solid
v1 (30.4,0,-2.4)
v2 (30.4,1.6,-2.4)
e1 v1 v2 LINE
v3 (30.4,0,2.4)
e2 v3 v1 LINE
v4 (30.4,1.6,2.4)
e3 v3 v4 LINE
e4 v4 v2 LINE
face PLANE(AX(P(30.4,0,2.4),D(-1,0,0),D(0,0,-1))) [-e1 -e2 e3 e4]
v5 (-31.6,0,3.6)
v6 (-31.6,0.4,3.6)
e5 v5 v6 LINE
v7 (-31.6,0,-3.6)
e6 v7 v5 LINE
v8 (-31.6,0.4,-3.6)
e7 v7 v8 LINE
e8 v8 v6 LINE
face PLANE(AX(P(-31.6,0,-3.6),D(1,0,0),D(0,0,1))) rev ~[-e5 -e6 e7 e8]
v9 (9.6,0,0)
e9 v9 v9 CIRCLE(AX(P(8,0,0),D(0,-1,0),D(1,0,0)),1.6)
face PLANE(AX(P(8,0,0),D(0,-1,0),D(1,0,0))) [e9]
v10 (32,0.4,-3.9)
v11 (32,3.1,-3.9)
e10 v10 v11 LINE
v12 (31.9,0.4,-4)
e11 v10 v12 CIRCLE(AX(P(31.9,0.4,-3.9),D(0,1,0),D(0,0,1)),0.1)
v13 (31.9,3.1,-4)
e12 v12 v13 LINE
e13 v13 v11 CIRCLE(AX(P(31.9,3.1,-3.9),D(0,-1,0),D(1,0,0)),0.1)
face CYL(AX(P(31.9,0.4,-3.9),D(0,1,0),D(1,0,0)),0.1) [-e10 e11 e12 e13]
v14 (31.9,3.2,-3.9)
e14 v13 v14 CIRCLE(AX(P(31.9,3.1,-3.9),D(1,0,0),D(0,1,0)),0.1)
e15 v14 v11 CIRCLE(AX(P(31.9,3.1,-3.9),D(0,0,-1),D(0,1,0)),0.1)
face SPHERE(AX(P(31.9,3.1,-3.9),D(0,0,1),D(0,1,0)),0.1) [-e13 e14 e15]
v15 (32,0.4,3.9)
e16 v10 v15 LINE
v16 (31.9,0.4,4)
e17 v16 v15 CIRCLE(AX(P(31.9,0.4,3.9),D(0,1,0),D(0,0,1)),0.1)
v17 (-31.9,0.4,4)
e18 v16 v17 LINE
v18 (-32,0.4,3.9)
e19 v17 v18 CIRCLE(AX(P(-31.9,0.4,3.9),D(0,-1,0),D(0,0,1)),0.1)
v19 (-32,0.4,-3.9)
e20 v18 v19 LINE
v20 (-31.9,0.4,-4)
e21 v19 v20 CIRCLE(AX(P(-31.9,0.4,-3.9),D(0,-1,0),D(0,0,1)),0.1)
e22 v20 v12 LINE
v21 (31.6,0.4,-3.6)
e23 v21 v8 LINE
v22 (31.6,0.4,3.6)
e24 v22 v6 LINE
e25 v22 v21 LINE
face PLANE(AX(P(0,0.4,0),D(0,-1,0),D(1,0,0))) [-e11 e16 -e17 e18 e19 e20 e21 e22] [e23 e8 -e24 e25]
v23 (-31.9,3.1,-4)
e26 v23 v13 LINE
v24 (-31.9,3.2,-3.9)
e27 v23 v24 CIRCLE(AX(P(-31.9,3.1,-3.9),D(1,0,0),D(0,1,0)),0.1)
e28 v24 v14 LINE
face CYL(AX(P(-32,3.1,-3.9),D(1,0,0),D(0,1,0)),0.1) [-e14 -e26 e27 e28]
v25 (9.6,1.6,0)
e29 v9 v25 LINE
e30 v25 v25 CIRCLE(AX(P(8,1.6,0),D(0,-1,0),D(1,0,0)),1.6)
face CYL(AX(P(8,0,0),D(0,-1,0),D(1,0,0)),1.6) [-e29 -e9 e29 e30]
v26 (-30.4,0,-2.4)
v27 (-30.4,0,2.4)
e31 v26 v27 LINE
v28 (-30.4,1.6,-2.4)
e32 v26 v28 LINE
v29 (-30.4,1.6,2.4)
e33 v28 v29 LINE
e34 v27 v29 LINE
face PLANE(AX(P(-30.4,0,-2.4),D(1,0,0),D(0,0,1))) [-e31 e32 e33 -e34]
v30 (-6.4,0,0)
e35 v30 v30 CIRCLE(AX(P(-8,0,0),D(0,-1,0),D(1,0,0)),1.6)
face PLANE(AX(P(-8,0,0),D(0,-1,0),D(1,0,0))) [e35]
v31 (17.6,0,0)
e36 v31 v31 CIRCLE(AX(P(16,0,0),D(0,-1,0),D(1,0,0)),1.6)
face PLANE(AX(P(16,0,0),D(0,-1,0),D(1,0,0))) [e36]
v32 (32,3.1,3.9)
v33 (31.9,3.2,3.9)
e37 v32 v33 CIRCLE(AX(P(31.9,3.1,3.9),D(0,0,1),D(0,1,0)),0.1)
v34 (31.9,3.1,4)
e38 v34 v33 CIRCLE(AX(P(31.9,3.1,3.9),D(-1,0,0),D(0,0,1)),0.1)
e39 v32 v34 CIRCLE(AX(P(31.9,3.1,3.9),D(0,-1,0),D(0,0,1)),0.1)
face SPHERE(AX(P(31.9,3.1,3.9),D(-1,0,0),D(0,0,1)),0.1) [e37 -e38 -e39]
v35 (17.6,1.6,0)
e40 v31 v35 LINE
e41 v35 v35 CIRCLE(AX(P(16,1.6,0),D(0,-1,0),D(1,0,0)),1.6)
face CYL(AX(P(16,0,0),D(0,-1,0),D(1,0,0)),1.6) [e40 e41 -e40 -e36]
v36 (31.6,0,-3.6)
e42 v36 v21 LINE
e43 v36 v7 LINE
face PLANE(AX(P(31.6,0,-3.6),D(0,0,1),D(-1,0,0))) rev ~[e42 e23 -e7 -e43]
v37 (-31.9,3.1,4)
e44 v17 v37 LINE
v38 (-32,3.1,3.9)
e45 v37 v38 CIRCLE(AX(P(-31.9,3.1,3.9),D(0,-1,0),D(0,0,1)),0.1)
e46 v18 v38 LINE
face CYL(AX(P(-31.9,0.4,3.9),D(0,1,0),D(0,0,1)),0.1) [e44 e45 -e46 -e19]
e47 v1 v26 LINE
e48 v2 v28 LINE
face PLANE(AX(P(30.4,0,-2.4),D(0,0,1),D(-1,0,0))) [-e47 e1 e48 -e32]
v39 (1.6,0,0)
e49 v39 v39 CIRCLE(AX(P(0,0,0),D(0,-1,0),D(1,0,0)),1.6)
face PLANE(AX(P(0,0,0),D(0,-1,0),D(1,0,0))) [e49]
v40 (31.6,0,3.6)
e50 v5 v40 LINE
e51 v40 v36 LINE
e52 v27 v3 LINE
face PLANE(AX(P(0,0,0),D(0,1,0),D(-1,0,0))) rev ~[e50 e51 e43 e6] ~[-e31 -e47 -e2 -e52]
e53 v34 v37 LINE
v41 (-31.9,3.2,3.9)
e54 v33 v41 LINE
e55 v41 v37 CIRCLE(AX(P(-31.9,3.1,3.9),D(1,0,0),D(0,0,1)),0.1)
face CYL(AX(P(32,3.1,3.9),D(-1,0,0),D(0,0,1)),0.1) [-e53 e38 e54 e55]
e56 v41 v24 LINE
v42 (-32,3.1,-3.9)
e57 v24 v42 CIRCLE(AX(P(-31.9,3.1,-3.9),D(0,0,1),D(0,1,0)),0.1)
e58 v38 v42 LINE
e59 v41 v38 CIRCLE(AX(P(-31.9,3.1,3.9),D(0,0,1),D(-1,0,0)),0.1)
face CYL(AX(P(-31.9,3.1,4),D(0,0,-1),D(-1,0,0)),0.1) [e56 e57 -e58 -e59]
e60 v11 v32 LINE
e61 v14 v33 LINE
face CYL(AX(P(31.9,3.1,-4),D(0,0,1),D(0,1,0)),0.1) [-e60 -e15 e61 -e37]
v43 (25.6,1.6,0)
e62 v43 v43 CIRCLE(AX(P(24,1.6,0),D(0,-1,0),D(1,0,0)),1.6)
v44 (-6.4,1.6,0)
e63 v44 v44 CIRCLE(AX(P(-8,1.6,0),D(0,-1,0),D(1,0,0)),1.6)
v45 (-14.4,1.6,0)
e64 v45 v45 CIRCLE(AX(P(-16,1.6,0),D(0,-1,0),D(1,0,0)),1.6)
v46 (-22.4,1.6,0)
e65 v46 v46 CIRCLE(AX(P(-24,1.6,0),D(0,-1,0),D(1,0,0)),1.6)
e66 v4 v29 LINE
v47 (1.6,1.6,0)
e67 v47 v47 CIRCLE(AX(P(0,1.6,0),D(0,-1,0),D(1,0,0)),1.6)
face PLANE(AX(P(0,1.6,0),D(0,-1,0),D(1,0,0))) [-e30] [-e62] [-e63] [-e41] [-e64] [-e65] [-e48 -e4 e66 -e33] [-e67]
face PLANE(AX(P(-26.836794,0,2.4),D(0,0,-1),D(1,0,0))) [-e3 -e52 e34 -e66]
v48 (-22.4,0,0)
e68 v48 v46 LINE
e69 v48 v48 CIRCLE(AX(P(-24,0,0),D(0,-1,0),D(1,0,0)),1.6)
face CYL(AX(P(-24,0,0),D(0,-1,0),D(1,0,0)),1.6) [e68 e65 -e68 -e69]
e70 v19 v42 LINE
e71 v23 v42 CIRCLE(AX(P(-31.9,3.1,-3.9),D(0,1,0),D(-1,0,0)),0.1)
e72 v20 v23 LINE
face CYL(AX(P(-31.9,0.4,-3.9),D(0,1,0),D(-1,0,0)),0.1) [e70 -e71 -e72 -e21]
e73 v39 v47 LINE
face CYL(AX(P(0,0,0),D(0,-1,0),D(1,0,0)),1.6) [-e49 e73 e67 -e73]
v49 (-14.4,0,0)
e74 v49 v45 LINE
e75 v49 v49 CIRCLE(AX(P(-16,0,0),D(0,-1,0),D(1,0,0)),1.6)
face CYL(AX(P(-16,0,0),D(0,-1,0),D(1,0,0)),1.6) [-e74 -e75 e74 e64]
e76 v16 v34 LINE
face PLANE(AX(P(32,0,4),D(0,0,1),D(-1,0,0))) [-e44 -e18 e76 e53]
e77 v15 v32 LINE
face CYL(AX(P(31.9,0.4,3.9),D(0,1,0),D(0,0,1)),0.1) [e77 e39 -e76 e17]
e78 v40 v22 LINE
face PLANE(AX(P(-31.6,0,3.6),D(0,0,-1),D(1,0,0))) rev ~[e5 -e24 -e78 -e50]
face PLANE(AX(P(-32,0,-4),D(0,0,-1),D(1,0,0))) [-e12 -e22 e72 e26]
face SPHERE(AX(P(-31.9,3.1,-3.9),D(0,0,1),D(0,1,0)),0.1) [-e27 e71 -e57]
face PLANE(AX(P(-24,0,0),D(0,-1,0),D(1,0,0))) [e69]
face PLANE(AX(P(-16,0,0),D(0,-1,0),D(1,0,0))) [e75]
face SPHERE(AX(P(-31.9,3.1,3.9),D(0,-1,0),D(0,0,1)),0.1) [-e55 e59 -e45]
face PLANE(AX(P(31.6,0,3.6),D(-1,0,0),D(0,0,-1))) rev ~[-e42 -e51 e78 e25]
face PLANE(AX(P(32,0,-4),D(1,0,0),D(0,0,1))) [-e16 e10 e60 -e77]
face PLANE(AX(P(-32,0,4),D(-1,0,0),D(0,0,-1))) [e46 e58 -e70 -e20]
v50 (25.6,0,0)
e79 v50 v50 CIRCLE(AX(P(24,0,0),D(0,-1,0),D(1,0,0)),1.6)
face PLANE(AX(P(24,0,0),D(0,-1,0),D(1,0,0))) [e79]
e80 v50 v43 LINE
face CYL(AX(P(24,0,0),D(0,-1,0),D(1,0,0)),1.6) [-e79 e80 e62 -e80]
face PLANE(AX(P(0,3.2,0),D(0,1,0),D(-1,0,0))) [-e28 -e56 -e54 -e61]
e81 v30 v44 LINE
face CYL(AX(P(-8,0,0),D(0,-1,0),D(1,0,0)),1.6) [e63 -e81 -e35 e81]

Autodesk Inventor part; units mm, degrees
ref_plane "YZ Plane" through (0, 0, 0) normal (1, 0, 0) x (0, 1, 0)
ref_plane "XZ Plane" through (0, 0, 0) normal (0, 1, 0) x (-1, 0, 0)
ref_plane "XY Plane" through (0, 0, 0) normal (0, 0, 1) x (1, 0, 0)
sketch "Sketch2" plane through (0, 0, 0) normal (0, 1, 0) x (-1, 0, 0)
  line L0 (-32, 4) -> (32, 4)
  line L1 (32, 4) -> (32, -4)
  line L2 (32, -4) -> (-32, -4)
  line L3 (-32, -4) -> (-32, 4)
  point P0 (0, 0)
  point P1 (0, 4)
  point P2 (-32, 0)
  dimension "d0" = 64
  dimension "d1" = 8
extrude "Extrusion1" add sketch "Sketch2" along normal blind 3.2
sketch "Sketch3" plane through (0, 0, 0) normal (0, -1, 0) x (1, 0, 0)
  line L0 (32, 4) -> (-32, 4) projected
  line L1 (-32, 4) -> (-32, -4) projected
  line L2 (-30.4, 2.4) -> (30.4, 2.4)
  line L3 (30.4, 2.4) -> (30.4, -2.4)
  line L4 (30.4, -2.4) -> (-30.4, -2.4)
  line L5 (-30.4, -2.4) -> (-30.4, 2.4)
  circle A0 centre (-24, 4) radius 3.2569
  circle A1 centre (-24, 4) radius 2.4
  line L6 (-32, -4) -> (32, -4) projected
  circle A2 centre (0, 0) radius 1.6
  line L7 (32, -4) -> (32, 4) projected
  line L8 (-20, 0) -> (-12, 0) construction
  line L9 (-12, 0) -> (-4, 0) construction
  line L10 (4, 0) -> (12, 0) construction
  line L11 (12, 0) -> (20, 0) construction
  line L12 (-4, 0) -> (4, 0) construction
  line L13 (-28, 0) -> (-20, 0) construction
  line L14 (20, 0) -> (28, 0) construction
  line L15 (-31.6, 3.6) -> (31.6, 3.6)
  line L16 (31.6, 3.6) -> (31.6, -3.6)
  line L17 (31.6, -3.6) -> (-31.6, -3.6)
  line L18 (-31.6, -3.6) -> (-31.6, 3.6)
  point P0 (-30.4, 0)
  point P1 (0, 2.4)
  point P2 (0, 3.6)
  point P3 (-31.6, 0)
  dimension "d8" = 1.6
  dimension "d60" = 6.5137
  dimension "d61" = 4.8
  dimension "d62" = 1.6
  dimension "d75" = 8
  dimension "d76" = 8
  dimension "d86" = 3.2
  dimension "d93" = 8
  dimension "d99" = 0.4
  dimension "d100" = 0.4
extrude "Extrusion2" cut sketch "Sketch3" against normal blind 1.6 contours A0 L2 A1 | L2 L3 L4 L5 A0 | A1 L2 | A2
extrude "Extrusion7" cut sketch "Sketch3" against normal blind 0.4 contours L7 L6 L1 L0 A0 L15 L18 L17 L16 | A0 L15 A1 L0 | A1 L15 L0 | L0 A1 L15 A0
extrude "Extrusion6" add sketch "Sketch3" against normal up to next contours A2
pattern_linear "Rectangular Pattern3" count 7 spacing 8 along (-1, 0, 0) of "Extrusion6" first direction both ways yes
fillet "Fillet1" radius 0.1 8 edges at (-32, 1.8, 4) (0, 3.2, 4) (-32, 3.2, 0) (32, 1.8, 4) (32, 3.2, 0) (0, 3.2, -4) (32, 1.8, -4) (-32, 1.8, -4)
equation "\"d4\" = 0.333333 * lh"
equation "\"d8\" = d62"
equation "\"d60\" = tubeod"
equation "\"d61\" = kd"
equation "\"d62\" = wall"
equation "\"d75\" = lu"
equation "\"d76\" = d75"
equation "\"d86\" = pd"
equation "\"d93\" = lu"
equation "\"d99\" = gw"
equation "\"d100\" = gw"
equation "\"d11\" = 0.333333 * lh - topthk"
equation "\"d101\" = gh"
equation "\"d91\" = lu"
equation "\"d22\" = lf"
equation "\"lh\" = 9.6"
equation "\"tubeod\" = 6.513708"
equation "\"kd\" = 4.8"
equation "\"wall\" = 1.6"
equation "\"lu\" = 8"
equation "\"pd\" = 3.2"
equation "\"gw\" = 0.4"
equation "\"topthk\" = 1.6"
equation "\"gh\" = 0.4"
equation "\"lf\" = 0.1"
properties part number "4162-LtBluishGray" material "ABS Plastic"
